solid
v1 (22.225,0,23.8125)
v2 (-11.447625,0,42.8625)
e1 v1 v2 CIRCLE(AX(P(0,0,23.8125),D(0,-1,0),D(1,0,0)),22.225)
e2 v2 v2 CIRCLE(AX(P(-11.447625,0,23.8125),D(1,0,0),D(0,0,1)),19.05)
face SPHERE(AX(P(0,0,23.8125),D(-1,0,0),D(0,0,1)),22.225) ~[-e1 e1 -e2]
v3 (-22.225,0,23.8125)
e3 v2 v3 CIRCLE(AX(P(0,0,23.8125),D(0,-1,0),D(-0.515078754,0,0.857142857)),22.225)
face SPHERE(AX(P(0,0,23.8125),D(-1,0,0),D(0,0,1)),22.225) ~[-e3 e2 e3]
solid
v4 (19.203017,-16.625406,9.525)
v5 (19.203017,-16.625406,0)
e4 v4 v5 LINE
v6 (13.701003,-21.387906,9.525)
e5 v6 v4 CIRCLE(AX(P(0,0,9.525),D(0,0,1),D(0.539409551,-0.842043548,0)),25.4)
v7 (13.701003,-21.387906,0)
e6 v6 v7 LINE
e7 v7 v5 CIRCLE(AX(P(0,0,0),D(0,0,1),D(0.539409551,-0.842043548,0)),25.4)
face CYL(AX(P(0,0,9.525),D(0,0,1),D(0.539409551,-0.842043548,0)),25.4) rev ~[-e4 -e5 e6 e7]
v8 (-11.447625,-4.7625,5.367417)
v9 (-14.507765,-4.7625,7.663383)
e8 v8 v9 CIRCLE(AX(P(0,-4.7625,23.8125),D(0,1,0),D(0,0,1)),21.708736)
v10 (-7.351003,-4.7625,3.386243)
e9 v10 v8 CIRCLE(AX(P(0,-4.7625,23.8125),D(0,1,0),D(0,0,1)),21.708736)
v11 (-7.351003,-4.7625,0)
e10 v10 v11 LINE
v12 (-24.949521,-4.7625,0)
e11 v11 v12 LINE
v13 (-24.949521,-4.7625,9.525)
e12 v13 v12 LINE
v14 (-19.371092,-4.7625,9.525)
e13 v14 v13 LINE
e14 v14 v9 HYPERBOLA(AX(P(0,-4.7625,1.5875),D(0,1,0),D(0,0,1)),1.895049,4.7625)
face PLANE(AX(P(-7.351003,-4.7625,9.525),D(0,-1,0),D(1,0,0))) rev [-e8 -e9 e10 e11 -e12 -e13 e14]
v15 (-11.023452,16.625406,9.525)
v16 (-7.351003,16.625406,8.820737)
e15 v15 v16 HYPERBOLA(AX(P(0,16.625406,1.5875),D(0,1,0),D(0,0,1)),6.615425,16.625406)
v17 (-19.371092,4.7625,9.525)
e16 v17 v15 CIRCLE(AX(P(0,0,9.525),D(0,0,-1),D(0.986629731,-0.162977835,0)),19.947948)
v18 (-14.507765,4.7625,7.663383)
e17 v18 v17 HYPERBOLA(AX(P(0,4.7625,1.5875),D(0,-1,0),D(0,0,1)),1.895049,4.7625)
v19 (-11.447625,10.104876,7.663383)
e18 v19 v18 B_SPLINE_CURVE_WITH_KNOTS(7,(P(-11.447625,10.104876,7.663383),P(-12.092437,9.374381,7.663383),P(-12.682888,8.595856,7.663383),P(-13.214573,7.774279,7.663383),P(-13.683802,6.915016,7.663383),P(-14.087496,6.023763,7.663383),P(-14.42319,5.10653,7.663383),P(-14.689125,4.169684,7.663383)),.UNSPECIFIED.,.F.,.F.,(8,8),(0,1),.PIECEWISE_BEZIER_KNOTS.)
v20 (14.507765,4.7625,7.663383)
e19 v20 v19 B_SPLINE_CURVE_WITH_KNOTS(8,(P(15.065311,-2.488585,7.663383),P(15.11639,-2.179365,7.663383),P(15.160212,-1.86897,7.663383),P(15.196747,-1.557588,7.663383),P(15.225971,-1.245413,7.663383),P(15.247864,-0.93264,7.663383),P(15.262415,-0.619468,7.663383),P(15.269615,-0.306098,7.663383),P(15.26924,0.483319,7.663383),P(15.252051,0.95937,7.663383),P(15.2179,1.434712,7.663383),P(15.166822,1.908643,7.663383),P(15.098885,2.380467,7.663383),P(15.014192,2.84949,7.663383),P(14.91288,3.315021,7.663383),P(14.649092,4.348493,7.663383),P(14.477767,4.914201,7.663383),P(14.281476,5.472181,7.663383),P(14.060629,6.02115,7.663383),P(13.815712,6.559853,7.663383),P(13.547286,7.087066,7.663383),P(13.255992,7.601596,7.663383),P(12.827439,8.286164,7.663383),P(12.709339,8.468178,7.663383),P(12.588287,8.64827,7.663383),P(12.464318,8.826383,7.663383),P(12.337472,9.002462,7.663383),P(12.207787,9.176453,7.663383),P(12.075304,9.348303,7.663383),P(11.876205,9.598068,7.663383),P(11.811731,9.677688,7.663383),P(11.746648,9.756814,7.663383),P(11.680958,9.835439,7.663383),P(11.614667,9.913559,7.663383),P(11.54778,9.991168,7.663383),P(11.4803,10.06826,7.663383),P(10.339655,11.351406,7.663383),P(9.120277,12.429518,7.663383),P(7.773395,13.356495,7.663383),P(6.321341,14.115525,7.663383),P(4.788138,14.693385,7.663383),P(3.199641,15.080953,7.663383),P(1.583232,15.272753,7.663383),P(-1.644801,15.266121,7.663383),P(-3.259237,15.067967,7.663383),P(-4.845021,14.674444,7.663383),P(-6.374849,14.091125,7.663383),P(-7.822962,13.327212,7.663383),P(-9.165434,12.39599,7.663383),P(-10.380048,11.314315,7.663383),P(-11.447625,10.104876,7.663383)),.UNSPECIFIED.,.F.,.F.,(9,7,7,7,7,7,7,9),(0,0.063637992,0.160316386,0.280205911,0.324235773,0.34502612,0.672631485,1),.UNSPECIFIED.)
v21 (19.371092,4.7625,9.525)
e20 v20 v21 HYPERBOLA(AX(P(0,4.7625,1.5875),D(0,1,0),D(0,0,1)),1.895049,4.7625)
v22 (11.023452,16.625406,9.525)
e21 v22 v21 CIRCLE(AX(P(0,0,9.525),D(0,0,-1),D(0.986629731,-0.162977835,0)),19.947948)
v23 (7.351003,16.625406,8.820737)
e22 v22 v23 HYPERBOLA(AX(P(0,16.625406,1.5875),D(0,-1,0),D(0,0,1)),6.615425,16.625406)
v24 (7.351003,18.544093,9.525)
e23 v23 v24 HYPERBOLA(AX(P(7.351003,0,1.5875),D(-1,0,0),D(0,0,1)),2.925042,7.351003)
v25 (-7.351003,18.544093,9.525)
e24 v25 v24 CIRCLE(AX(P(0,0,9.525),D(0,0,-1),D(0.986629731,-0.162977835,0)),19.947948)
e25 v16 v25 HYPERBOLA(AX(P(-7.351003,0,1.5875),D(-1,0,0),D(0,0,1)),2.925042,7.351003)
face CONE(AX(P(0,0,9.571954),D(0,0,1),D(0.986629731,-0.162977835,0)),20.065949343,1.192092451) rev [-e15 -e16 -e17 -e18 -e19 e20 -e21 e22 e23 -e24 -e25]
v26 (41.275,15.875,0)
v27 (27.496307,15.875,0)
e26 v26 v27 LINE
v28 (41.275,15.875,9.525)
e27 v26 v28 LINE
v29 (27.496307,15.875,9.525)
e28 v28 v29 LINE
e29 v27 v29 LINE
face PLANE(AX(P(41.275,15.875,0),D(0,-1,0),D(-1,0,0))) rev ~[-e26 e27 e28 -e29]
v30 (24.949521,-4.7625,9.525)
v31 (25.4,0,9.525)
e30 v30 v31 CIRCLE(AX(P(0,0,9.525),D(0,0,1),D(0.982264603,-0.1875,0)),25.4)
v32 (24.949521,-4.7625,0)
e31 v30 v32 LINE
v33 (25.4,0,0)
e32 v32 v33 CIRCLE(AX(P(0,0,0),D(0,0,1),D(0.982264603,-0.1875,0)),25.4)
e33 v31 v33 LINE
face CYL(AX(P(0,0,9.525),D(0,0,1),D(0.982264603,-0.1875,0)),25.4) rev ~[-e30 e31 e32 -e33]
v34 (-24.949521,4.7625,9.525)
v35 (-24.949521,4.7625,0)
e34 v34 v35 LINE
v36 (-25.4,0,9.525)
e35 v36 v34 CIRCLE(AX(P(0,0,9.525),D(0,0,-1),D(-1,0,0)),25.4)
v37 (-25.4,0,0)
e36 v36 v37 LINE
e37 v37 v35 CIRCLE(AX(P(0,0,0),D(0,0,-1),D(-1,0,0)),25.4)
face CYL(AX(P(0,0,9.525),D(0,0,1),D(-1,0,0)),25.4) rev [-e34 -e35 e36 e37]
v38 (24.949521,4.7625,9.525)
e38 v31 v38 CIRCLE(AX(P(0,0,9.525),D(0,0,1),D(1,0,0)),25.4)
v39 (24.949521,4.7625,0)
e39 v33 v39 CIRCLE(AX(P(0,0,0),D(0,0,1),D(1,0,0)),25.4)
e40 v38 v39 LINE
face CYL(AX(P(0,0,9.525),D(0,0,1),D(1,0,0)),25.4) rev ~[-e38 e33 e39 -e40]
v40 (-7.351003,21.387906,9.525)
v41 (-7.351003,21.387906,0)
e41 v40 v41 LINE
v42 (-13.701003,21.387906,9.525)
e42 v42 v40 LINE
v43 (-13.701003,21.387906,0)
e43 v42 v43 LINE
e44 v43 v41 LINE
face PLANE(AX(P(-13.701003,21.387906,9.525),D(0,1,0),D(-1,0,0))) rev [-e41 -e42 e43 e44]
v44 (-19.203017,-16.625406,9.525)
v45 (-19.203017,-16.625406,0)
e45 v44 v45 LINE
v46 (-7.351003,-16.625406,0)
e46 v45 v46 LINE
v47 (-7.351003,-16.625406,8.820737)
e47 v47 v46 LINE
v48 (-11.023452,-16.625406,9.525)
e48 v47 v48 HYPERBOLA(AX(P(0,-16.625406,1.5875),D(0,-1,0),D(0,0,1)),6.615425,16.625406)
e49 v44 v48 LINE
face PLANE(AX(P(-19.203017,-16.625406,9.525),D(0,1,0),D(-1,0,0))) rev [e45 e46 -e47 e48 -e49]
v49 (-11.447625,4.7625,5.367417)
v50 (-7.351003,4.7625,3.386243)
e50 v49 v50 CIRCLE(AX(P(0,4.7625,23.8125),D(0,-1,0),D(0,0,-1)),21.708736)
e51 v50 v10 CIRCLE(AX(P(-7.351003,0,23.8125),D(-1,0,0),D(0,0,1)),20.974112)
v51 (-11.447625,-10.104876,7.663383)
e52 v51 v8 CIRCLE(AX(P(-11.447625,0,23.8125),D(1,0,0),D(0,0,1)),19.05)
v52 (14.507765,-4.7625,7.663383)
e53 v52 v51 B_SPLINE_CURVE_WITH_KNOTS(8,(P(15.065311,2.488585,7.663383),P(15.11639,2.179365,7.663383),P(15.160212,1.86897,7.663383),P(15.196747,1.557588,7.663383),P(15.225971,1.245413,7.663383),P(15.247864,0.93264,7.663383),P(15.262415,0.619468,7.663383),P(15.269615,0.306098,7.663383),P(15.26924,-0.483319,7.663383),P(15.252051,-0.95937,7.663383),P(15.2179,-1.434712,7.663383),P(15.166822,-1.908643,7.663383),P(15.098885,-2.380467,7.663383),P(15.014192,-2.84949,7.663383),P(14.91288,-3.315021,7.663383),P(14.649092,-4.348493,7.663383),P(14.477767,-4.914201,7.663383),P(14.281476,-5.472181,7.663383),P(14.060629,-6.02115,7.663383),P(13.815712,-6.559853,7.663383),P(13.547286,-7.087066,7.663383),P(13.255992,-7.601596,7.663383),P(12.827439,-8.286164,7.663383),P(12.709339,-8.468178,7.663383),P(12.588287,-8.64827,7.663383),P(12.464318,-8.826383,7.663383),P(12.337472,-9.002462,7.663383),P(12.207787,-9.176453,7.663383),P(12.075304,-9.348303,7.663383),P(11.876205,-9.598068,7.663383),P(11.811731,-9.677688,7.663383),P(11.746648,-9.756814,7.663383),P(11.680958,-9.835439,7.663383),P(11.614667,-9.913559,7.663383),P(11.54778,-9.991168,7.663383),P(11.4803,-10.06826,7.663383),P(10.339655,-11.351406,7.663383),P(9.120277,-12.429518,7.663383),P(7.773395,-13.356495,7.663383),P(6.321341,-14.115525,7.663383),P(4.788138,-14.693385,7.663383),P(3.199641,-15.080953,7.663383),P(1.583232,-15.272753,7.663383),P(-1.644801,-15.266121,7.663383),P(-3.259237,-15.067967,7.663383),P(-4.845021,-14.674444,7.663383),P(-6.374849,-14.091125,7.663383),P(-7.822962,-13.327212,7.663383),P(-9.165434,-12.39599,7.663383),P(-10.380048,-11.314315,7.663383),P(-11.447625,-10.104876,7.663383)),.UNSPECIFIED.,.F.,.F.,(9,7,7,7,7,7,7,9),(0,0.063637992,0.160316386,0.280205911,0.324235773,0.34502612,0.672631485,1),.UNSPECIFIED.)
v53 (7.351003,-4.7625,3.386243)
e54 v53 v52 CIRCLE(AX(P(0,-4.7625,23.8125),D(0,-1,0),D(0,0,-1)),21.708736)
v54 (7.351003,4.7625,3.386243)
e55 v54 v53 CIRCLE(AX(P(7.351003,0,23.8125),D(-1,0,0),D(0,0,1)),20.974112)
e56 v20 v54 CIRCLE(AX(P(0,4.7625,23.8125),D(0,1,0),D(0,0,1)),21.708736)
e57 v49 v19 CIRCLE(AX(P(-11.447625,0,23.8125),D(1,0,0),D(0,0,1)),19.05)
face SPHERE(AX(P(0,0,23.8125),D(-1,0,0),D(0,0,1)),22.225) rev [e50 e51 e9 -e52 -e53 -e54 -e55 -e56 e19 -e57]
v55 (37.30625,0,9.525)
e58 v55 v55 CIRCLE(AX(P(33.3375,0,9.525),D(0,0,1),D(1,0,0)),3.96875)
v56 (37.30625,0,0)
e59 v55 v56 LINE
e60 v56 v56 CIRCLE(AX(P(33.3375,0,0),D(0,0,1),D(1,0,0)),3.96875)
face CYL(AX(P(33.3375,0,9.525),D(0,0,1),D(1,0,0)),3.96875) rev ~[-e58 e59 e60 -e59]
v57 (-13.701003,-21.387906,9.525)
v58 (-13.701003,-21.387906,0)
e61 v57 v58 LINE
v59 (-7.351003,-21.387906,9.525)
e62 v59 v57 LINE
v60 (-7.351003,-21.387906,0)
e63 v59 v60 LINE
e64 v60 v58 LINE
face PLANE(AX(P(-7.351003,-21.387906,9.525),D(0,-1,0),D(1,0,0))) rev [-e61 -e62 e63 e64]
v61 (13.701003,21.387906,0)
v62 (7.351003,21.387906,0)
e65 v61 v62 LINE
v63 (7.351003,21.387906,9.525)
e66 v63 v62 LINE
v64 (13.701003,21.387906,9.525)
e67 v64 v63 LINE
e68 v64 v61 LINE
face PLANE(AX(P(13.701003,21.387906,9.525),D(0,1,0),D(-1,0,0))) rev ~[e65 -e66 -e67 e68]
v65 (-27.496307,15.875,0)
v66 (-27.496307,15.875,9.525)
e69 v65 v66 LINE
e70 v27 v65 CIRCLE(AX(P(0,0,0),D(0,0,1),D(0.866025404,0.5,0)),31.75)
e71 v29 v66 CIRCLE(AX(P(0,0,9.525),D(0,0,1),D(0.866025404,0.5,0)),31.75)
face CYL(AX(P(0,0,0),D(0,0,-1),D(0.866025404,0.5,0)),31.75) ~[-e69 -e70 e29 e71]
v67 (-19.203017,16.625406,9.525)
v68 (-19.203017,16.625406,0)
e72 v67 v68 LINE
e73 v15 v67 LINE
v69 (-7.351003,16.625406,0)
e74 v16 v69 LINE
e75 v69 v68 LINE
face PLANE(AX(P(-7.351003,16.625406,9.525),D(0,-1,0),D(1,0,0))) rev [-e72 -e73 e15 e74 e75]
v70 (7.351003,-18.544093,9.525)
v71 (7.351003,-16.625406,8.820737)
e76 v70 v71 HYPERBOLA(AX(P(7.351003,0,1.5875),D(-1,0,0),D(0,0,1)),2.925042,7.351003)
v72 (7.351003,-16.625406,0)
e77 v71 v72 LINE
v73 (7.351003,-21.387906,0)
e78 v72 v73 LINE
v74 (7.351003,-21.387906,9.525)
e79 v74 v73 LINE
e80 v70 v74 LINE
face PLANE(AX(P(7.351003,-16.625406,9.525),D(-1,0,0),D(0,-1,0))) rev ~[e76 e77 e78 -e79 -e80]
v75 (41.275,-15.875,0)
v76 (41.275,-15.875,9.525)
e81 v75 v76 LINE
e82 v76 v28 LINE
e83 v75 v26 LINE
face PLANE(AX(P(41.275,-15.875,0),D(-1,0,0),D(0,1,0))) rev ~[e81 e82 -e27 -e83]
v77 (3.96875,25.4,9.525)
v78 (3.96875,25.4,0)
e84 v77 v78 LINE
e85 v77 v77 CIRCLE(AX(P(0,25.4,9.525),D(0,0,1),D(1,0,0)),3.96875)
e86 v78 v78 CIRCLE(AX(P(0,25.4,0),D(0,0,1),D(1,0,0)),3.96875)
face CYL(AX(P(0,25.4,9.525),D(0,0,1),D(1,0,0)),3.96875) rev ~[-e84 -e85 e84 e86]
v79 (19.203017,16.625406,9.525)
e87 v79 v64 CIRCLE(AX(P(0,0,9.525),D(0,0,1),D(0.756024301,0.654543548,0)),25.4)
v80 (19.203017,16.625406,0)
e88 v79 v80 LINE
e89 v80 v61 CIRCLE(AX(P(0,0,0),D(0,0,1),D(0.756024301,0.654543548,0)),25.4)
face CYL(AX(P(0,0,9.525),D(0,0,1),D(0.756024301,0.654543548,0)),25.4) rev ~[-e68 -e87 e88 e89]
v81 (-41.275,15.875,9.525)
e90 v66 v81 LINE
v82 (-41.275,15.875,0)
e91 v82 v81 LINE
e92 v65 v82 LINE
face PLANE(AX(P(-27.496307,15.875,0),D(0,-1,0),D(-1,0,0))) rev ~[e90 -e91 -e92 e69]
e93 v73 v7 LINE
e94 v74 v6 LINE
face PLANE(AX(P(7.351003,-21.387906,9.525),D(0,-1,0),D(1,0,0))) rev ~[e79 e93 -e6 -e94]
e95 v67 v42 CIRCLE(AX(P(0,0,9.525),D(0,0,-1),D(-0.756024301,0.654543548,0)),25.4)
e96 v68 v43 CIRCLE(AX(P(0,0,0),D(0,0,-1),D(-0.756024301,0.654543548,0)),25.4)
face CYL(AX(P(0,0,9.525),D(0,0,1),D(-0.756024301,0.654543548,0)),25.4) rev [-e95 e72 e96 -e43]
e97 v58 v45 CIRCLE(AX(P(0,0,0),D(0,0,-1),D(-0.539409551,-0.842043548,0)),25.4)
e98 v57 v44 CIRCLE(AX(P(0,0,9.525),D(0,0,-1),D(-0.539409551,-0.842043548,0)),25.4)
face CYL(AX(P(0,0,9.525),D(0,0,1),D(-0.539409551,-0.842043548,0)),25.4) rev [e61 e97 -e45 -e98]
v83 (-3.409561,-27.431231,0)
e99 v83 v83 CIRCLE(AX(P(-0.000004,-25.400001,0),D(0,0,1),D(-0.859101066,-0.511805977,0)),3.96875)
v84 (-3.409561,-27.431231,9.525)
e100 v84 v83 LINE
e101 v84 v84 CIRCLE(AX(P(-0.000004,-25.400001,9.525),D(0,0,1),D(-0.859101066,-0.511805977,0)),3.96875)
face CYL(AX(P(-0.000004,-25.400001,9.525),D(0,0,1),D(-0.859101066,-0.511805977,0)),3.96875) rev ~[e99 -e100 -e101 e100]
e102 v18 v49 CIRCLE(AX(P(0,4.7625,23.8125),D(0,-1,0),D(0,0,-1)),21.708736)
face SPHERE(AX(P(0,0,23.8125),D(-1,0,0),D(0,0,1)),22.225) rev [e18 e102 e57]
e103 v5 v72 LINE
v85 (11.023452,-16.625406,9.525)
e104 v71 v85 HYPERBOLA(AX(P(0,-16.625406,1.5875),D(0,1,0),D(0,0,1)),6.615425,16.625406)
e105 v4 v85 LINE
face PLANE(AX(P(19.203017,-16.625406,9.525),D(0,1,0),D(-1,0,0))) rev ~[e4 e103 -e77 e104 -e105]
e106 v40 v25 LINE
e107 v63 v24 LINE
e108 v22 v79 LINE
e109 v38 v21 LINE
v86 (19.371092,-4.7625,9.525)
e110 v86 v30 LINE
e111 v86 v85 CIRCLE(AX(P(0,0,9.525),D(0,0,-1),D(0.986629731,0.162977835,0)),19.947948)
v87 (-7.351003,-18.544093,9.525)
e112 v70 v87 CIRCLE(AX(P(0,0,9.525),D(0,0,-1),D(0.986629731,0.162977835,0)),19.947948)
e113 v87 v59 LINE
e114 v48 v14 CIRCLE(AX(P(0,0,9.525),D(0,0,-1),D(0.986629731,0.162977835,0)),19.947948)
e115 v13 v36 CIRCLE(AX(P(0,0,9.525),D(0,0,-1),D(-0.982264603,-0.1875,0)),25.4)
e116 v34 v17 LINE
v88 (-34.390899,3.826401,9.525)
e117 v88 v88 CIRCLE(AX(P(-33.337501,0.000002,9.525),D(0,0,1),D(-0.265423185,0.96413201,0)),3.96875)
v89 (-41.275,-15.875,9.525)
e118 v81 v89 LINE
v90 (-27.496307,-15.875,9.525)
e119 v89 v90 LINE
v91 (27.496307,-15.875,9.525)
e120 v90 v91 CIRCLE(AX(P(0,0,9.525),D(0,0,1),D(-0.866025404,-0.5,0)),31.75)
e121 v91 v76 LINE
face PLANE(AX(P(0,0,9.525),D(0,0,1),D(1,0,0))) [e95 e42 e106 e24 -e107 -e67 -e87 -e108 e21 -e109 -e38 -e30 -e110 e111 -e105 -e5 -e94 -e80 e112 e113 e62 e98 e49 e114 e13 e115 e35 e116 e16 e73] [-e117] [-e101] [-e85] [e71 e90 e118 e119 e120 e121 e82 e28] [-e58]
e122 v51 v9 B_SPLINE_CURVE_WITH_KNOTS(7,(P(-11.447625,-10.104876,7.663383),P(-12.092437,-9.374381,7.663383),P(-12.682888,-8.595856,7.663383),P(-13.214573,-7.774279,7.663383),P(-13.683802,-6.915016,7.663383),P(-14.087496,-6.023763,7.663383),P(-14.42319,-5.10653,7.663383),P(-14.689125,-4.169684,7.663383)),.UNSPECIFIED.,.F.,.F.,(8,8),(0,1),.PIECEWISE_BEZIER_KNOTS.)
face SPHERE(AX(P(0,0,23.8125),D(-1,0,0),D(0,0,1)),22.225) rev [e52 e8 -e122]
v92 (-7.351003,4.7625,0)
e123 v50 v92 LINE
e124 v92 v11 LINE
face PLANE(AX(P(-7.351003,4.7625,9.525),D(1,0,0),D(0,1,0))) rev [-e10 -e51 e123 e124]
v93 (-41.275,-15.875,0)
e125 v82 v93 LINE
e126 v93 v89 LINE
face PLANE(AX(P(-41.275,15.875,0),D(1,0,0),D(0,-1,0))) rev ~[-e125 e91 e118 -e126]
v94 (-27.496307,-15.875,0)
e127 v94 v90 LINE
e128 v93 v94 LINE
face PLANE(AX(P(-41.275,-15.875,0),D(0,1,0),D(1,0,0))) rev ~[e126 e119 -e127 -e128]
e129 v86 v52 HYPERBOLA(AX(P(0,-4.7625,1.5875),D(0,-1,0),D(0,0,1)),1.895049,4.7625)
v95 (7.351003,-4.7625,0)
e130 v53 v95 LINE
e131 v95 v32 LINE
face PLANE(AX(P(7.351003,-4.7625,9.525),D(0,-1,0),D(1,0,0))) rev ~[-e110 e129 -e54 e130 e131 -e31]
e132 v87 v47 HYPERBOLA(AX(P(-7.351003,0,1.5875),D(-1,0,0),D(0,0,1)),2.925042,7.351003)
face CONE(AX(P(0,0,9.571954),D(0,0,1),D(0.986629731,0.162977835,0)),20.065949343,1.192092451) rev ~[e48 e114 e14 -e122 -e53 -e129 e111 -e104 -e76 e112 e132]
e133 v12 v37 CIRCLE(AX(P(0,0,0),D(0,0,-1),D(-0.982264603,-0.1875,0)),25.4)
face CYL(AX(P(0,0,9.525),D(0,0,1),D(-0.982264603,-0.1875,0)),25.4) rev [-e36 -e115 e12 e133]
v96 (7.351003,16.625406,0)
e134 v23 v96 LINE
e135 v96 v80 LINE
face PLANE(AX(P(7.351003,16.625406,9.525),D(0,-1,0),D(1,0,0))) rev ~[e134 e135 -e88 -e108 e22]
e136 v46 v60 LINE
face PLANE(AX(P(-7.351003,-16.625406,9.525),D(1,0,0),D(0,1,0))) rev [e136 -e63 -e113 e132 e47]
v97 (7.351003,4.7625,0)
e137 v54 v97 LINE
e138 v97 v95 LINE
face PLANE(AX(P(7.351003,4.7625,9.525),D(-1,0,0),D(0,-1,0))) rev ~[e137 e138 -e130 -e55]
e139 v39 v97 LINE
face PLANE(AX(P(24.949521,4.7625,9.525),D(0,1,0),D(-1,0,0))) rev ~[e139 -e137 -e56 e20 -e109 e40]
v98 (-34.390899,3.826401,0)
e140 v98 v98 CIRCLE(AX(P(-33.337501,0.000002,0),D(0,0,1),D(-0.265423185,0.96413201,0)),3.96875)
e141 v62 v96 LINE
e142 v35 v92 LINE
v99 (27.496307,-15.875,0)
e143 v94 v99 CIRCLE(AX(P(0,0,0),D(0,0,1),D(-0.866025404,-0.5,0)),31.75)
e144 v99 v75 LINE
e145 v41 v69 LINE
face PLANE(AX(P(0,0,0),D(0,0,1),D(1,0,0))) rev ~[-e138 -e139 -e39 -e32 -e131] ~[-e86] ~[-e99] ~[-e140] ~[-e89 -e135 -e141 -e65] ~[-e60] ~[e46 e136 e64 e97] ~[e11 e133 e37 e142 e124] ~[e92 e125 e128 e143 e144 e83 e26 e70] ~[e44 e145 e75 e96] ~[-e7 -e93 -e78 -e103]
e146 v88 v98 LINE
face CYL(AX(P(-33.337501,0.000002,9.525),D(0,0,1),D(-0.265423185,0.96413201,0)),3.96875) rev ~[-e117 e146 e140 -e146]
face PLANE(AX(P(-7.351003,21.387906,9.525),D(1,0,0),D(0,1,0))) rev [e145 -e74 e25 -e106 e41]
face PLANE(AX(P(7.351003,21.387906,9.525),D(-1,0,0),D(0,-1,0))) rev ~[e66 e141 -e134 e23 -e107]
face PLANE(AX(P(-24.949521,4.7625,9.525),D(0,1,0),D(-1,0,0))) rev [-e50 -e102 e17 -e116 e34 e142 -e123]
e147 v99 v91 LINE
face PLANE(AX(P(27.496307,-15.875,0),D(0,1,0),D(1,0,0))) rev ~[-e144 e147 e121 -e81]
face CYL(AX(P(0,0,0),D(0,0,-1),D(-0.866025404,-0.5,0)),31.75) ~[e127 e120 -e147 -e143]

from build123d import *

# Parameters (mm, degrees)
F1_DEPTH        = 9.525
F3_DEPTH        = 9.525
F6_R            = 3.96875
F7_DEPTH        = 9.526
F7_COPIES_COUNT = 3
F7_COPIES_ANGLE = 210.7842
F9_T2_ANGLE     = 198.7595657962
F9_T4_ANGLE     = 198.7595657962


# Not quite as in the source:
# - a fillet or chamfer that OpenCascade refuses, or shapes differently, is made with other operations: its cross-section is extruded or revolved along the edge and cut away or added
# - a pattern or mirror of a feature is missing from the dataset's text; its kind, count and spacing are read off the source's solid


with BuildPart() as f1:
    # F0 (on Top) → F1 (new body)
    with BuildSketch(Plane.XY):
        with BuildLine():
            Line((-41.275, -15.875), (-27.4963065702, -15.875))
            ThreePointArc((-27.4963065702, -15.875), (0, -31.75), (27.4963065702, -15.875))
            Line((27.4963065702, -15.875), (41.275, -15.875))
            Line((41.275, -15.875), (41.275, 15.875))
            Line((41.275, 15.875), (27.4963065702, 15.875))
            ThreePointArc((27.4963065702, 15.875), (0, 31.75), (-27.4963065702, 15.875))
            Line((-27.4963065702, 15.875), (-41.275, 15.875))
            Line((-41.275, 15.875), (-41.275, -15.875))
        make_face()
    extrude(amount=F1_DEPTH)

    # F2 (on face) → F3 (cut)
    with BuildSketch(Plane.XY.offset(9.525)):
        with BuildLine():
            Line((7.3510025854, 16.625406119), (19.2030172468, 16.625406119))
            ThreePointArc((19.2030172468, 16.625406119), (16.6234467498, 19.204713436), (13.7010025854, 21.387906119))
            Line((13.7010025854, 21.387906119), (7.3510025854, 21.387906119))
            Line((7.3510025854, 21.387906119), (7.3510025854, 16.625406119))
        make_face()
        with BuildLine():
            ThreePointArc((24.9495209122, -4.7625), (25.2871294453, -2.3918788461), (25.4, 0))
            ThreePointArc((25.4, 0), (25.2871294453, 2.3918788461), (24.9495209122, 4.7625))
            Line((24.9495209122, 4.7625), (7.3510025854, 4.7625))
            Line((7.3510025854, 4.7625), (7.3510025854, -4.7625))
            Line((7.3510025854, -4.7625), (24.9495209122, -4.7625))
        make_face()
        with BuildLine():
            ThreePointArc((13.7010025854, -21.387906119), (16.6234467498, -19.204713436), (19.2030172468, -16.625406119))
            Line((19.2030172468, -16.625406119), (7.3510025854, -16.625406119))
            Line((7.3510025854, -16.625406119), (7.3510025854, -21.387906119))
            Line((7.3510025854, -21.387906119), (13.7010025854, -21.387906119))
        make_face()
    f3 = extrude(amount=-F3_DEPTH, mode=Mode.SUBTRACT)

    # F3_copies: F3 across plane
    add(f3.mirror(Plane(origin=(0, 0, 0), x_dir=(0, 0, -1), z_dir=(-1, 0, 0))), mode=Mode.SUBTRACT)

    # F4 (on Front) → F5 (revolve, cut)
    with BuildSketch(Plane.XZ):
        with BuildLine():
            Line((-22.225, 23.8125), (22.225, 23.8125))
            ThreePointArc((22.225, 23.8125), (19.3439150288, 34.7561546162), (11.4476252996, 42.8625))
            ThreePointArc((11.4476252996, 42.8625), (0, 46.0375), (-11.4476252996, 42.8625))
            ThreePointArc((-11.4476252996, 42.8625), (-19.3439150288, 34.7561546162), (-22.225, 23.8125))
        make_face()
    revolve(axis=Axis((0, 0, 23.8125), (1, 0, 0)), mode=Mode.SUBTRACT)

    # F6 (on face) → F7 (cut, through all)
    with BuildSketch(Plane.XY.offset(9.525)):
        with Locations((0, 25.4)):
            Circle(F6_R)
        with Locations((33.3375, 0)):
            Circle(F6_R)
    f7 = extrude(amount=-F7_DEPTH, mode=Mode.SUBTRACT)

    # F7_copies: F7 ×3 about axis
    f7_copies_axis = Axis((-6.99256, 0, 0), (0, 0, 1))
    for i in range(1, F7_COPIES_COUNT):
        add(f7.rotate(f7_copies_axis, i * F7_COPIES_ANGLE / (F7_COPIES_COUNT - 1)), mode=Mode.SUBTRACT)

    # F9: chamfer of 3.175 on 2 edges, made by hand

    # F9_s1 → F9_t2 (revolve, cut)
    with BuildSketch(Plane(origin=(0, 0, 0), x_dir=(0, 0, 1), z_dir=(-0.1629778352, 0.9866297306, 0))):
        with BuildLine():
            Line((9.5719539947, 20.0659493432), (7.6164291959, 15.1514665774))
            Line((7.6164291959, 15.1514665774), (7.6625695297, 15.1078395261))
            ThreePointArc((7.6625695297, 15.1078395261), (8.5706488123, 16.0878231784), (9.5658214286, 16.9754007886))
            Line((9.5658214286, 16.9754007886), (9.5885, 17.0240409054))
            ThreePointArc((9.5885, 17.0240409054), (9.5885, 18.5449951243), (9.6354539947, 20.0659493432))
            Line((9.6354539947, 20.0659493432), (9.5719539947, 20.0659493432))
        make_face()
    revolve(axis=Axis((0, 0, 9.525), (0, 0, -1)), revolution_arc=F9_T2_ANGLE, mode=Mode.SUBTRACT)

    # F9_s3 → F9_t4 (revolve, cut)
    with BuildSketch(Plane(origin=(0, 0, 0), x_dir=(0, 0, 1), z_dir=(-0.1629778352, -0.9866297306, 0))):
        with BuildLine():
            Line((9.5719539947, -20.0659493432), (7.6164291959, -15.1514665774))
            Line((7.6164291959, -15.1514665774), (7.6625695297, -15.1078395261))
            ThreePointArc((7.6625695297, -15.1078395261), (8.5706488123, -16.0878231784), (9.5658214286, -16.9754007886))
            Line((9.5658214286, -16.9754007886), (9.5885, -17.0240409054))
            ThreePointArc((9.5885, -17.0240409054), (9.5885, -18.5449951243), (9.6354539947, -20.0659493432))
            Line((9.6354539947, -20.0659493432), (9.5719539947, -20.0659493432))
        make_face()
    revolve(axis=Axis((0, 0, 9.525), (0, 0, 1)), revolution_arc=F9_T4_ANGLE, mode=Mode.SUBTRACT)


with BuildPart() as f8:
    # F4 (on Front) → F8 (revolve)
    with BuildSketch(Plane.XZ):
        with BuildLine():
            Line((-22.225, 23.8125), (22.225, 23.8125))
            ThreePointArc((22.225, 23.8125), (19.3439150288, 34.7561546162), (11.4476252996, 42.8625))
            ThreePointArc((11.4476252996, 42.8625), (0, 46.0375), (-11.4476252996, 42.8625))
            ThreePointArc((-11.4476252996, 42.8625), (-19.3439150288, 34.7561546162), (-22.225, 23.8125))
        make_face()
    revolve(axis=Axis((0, 0, 23.8125), (1, 0, 0)))


solid = Compound([f1.part, f8.part])
